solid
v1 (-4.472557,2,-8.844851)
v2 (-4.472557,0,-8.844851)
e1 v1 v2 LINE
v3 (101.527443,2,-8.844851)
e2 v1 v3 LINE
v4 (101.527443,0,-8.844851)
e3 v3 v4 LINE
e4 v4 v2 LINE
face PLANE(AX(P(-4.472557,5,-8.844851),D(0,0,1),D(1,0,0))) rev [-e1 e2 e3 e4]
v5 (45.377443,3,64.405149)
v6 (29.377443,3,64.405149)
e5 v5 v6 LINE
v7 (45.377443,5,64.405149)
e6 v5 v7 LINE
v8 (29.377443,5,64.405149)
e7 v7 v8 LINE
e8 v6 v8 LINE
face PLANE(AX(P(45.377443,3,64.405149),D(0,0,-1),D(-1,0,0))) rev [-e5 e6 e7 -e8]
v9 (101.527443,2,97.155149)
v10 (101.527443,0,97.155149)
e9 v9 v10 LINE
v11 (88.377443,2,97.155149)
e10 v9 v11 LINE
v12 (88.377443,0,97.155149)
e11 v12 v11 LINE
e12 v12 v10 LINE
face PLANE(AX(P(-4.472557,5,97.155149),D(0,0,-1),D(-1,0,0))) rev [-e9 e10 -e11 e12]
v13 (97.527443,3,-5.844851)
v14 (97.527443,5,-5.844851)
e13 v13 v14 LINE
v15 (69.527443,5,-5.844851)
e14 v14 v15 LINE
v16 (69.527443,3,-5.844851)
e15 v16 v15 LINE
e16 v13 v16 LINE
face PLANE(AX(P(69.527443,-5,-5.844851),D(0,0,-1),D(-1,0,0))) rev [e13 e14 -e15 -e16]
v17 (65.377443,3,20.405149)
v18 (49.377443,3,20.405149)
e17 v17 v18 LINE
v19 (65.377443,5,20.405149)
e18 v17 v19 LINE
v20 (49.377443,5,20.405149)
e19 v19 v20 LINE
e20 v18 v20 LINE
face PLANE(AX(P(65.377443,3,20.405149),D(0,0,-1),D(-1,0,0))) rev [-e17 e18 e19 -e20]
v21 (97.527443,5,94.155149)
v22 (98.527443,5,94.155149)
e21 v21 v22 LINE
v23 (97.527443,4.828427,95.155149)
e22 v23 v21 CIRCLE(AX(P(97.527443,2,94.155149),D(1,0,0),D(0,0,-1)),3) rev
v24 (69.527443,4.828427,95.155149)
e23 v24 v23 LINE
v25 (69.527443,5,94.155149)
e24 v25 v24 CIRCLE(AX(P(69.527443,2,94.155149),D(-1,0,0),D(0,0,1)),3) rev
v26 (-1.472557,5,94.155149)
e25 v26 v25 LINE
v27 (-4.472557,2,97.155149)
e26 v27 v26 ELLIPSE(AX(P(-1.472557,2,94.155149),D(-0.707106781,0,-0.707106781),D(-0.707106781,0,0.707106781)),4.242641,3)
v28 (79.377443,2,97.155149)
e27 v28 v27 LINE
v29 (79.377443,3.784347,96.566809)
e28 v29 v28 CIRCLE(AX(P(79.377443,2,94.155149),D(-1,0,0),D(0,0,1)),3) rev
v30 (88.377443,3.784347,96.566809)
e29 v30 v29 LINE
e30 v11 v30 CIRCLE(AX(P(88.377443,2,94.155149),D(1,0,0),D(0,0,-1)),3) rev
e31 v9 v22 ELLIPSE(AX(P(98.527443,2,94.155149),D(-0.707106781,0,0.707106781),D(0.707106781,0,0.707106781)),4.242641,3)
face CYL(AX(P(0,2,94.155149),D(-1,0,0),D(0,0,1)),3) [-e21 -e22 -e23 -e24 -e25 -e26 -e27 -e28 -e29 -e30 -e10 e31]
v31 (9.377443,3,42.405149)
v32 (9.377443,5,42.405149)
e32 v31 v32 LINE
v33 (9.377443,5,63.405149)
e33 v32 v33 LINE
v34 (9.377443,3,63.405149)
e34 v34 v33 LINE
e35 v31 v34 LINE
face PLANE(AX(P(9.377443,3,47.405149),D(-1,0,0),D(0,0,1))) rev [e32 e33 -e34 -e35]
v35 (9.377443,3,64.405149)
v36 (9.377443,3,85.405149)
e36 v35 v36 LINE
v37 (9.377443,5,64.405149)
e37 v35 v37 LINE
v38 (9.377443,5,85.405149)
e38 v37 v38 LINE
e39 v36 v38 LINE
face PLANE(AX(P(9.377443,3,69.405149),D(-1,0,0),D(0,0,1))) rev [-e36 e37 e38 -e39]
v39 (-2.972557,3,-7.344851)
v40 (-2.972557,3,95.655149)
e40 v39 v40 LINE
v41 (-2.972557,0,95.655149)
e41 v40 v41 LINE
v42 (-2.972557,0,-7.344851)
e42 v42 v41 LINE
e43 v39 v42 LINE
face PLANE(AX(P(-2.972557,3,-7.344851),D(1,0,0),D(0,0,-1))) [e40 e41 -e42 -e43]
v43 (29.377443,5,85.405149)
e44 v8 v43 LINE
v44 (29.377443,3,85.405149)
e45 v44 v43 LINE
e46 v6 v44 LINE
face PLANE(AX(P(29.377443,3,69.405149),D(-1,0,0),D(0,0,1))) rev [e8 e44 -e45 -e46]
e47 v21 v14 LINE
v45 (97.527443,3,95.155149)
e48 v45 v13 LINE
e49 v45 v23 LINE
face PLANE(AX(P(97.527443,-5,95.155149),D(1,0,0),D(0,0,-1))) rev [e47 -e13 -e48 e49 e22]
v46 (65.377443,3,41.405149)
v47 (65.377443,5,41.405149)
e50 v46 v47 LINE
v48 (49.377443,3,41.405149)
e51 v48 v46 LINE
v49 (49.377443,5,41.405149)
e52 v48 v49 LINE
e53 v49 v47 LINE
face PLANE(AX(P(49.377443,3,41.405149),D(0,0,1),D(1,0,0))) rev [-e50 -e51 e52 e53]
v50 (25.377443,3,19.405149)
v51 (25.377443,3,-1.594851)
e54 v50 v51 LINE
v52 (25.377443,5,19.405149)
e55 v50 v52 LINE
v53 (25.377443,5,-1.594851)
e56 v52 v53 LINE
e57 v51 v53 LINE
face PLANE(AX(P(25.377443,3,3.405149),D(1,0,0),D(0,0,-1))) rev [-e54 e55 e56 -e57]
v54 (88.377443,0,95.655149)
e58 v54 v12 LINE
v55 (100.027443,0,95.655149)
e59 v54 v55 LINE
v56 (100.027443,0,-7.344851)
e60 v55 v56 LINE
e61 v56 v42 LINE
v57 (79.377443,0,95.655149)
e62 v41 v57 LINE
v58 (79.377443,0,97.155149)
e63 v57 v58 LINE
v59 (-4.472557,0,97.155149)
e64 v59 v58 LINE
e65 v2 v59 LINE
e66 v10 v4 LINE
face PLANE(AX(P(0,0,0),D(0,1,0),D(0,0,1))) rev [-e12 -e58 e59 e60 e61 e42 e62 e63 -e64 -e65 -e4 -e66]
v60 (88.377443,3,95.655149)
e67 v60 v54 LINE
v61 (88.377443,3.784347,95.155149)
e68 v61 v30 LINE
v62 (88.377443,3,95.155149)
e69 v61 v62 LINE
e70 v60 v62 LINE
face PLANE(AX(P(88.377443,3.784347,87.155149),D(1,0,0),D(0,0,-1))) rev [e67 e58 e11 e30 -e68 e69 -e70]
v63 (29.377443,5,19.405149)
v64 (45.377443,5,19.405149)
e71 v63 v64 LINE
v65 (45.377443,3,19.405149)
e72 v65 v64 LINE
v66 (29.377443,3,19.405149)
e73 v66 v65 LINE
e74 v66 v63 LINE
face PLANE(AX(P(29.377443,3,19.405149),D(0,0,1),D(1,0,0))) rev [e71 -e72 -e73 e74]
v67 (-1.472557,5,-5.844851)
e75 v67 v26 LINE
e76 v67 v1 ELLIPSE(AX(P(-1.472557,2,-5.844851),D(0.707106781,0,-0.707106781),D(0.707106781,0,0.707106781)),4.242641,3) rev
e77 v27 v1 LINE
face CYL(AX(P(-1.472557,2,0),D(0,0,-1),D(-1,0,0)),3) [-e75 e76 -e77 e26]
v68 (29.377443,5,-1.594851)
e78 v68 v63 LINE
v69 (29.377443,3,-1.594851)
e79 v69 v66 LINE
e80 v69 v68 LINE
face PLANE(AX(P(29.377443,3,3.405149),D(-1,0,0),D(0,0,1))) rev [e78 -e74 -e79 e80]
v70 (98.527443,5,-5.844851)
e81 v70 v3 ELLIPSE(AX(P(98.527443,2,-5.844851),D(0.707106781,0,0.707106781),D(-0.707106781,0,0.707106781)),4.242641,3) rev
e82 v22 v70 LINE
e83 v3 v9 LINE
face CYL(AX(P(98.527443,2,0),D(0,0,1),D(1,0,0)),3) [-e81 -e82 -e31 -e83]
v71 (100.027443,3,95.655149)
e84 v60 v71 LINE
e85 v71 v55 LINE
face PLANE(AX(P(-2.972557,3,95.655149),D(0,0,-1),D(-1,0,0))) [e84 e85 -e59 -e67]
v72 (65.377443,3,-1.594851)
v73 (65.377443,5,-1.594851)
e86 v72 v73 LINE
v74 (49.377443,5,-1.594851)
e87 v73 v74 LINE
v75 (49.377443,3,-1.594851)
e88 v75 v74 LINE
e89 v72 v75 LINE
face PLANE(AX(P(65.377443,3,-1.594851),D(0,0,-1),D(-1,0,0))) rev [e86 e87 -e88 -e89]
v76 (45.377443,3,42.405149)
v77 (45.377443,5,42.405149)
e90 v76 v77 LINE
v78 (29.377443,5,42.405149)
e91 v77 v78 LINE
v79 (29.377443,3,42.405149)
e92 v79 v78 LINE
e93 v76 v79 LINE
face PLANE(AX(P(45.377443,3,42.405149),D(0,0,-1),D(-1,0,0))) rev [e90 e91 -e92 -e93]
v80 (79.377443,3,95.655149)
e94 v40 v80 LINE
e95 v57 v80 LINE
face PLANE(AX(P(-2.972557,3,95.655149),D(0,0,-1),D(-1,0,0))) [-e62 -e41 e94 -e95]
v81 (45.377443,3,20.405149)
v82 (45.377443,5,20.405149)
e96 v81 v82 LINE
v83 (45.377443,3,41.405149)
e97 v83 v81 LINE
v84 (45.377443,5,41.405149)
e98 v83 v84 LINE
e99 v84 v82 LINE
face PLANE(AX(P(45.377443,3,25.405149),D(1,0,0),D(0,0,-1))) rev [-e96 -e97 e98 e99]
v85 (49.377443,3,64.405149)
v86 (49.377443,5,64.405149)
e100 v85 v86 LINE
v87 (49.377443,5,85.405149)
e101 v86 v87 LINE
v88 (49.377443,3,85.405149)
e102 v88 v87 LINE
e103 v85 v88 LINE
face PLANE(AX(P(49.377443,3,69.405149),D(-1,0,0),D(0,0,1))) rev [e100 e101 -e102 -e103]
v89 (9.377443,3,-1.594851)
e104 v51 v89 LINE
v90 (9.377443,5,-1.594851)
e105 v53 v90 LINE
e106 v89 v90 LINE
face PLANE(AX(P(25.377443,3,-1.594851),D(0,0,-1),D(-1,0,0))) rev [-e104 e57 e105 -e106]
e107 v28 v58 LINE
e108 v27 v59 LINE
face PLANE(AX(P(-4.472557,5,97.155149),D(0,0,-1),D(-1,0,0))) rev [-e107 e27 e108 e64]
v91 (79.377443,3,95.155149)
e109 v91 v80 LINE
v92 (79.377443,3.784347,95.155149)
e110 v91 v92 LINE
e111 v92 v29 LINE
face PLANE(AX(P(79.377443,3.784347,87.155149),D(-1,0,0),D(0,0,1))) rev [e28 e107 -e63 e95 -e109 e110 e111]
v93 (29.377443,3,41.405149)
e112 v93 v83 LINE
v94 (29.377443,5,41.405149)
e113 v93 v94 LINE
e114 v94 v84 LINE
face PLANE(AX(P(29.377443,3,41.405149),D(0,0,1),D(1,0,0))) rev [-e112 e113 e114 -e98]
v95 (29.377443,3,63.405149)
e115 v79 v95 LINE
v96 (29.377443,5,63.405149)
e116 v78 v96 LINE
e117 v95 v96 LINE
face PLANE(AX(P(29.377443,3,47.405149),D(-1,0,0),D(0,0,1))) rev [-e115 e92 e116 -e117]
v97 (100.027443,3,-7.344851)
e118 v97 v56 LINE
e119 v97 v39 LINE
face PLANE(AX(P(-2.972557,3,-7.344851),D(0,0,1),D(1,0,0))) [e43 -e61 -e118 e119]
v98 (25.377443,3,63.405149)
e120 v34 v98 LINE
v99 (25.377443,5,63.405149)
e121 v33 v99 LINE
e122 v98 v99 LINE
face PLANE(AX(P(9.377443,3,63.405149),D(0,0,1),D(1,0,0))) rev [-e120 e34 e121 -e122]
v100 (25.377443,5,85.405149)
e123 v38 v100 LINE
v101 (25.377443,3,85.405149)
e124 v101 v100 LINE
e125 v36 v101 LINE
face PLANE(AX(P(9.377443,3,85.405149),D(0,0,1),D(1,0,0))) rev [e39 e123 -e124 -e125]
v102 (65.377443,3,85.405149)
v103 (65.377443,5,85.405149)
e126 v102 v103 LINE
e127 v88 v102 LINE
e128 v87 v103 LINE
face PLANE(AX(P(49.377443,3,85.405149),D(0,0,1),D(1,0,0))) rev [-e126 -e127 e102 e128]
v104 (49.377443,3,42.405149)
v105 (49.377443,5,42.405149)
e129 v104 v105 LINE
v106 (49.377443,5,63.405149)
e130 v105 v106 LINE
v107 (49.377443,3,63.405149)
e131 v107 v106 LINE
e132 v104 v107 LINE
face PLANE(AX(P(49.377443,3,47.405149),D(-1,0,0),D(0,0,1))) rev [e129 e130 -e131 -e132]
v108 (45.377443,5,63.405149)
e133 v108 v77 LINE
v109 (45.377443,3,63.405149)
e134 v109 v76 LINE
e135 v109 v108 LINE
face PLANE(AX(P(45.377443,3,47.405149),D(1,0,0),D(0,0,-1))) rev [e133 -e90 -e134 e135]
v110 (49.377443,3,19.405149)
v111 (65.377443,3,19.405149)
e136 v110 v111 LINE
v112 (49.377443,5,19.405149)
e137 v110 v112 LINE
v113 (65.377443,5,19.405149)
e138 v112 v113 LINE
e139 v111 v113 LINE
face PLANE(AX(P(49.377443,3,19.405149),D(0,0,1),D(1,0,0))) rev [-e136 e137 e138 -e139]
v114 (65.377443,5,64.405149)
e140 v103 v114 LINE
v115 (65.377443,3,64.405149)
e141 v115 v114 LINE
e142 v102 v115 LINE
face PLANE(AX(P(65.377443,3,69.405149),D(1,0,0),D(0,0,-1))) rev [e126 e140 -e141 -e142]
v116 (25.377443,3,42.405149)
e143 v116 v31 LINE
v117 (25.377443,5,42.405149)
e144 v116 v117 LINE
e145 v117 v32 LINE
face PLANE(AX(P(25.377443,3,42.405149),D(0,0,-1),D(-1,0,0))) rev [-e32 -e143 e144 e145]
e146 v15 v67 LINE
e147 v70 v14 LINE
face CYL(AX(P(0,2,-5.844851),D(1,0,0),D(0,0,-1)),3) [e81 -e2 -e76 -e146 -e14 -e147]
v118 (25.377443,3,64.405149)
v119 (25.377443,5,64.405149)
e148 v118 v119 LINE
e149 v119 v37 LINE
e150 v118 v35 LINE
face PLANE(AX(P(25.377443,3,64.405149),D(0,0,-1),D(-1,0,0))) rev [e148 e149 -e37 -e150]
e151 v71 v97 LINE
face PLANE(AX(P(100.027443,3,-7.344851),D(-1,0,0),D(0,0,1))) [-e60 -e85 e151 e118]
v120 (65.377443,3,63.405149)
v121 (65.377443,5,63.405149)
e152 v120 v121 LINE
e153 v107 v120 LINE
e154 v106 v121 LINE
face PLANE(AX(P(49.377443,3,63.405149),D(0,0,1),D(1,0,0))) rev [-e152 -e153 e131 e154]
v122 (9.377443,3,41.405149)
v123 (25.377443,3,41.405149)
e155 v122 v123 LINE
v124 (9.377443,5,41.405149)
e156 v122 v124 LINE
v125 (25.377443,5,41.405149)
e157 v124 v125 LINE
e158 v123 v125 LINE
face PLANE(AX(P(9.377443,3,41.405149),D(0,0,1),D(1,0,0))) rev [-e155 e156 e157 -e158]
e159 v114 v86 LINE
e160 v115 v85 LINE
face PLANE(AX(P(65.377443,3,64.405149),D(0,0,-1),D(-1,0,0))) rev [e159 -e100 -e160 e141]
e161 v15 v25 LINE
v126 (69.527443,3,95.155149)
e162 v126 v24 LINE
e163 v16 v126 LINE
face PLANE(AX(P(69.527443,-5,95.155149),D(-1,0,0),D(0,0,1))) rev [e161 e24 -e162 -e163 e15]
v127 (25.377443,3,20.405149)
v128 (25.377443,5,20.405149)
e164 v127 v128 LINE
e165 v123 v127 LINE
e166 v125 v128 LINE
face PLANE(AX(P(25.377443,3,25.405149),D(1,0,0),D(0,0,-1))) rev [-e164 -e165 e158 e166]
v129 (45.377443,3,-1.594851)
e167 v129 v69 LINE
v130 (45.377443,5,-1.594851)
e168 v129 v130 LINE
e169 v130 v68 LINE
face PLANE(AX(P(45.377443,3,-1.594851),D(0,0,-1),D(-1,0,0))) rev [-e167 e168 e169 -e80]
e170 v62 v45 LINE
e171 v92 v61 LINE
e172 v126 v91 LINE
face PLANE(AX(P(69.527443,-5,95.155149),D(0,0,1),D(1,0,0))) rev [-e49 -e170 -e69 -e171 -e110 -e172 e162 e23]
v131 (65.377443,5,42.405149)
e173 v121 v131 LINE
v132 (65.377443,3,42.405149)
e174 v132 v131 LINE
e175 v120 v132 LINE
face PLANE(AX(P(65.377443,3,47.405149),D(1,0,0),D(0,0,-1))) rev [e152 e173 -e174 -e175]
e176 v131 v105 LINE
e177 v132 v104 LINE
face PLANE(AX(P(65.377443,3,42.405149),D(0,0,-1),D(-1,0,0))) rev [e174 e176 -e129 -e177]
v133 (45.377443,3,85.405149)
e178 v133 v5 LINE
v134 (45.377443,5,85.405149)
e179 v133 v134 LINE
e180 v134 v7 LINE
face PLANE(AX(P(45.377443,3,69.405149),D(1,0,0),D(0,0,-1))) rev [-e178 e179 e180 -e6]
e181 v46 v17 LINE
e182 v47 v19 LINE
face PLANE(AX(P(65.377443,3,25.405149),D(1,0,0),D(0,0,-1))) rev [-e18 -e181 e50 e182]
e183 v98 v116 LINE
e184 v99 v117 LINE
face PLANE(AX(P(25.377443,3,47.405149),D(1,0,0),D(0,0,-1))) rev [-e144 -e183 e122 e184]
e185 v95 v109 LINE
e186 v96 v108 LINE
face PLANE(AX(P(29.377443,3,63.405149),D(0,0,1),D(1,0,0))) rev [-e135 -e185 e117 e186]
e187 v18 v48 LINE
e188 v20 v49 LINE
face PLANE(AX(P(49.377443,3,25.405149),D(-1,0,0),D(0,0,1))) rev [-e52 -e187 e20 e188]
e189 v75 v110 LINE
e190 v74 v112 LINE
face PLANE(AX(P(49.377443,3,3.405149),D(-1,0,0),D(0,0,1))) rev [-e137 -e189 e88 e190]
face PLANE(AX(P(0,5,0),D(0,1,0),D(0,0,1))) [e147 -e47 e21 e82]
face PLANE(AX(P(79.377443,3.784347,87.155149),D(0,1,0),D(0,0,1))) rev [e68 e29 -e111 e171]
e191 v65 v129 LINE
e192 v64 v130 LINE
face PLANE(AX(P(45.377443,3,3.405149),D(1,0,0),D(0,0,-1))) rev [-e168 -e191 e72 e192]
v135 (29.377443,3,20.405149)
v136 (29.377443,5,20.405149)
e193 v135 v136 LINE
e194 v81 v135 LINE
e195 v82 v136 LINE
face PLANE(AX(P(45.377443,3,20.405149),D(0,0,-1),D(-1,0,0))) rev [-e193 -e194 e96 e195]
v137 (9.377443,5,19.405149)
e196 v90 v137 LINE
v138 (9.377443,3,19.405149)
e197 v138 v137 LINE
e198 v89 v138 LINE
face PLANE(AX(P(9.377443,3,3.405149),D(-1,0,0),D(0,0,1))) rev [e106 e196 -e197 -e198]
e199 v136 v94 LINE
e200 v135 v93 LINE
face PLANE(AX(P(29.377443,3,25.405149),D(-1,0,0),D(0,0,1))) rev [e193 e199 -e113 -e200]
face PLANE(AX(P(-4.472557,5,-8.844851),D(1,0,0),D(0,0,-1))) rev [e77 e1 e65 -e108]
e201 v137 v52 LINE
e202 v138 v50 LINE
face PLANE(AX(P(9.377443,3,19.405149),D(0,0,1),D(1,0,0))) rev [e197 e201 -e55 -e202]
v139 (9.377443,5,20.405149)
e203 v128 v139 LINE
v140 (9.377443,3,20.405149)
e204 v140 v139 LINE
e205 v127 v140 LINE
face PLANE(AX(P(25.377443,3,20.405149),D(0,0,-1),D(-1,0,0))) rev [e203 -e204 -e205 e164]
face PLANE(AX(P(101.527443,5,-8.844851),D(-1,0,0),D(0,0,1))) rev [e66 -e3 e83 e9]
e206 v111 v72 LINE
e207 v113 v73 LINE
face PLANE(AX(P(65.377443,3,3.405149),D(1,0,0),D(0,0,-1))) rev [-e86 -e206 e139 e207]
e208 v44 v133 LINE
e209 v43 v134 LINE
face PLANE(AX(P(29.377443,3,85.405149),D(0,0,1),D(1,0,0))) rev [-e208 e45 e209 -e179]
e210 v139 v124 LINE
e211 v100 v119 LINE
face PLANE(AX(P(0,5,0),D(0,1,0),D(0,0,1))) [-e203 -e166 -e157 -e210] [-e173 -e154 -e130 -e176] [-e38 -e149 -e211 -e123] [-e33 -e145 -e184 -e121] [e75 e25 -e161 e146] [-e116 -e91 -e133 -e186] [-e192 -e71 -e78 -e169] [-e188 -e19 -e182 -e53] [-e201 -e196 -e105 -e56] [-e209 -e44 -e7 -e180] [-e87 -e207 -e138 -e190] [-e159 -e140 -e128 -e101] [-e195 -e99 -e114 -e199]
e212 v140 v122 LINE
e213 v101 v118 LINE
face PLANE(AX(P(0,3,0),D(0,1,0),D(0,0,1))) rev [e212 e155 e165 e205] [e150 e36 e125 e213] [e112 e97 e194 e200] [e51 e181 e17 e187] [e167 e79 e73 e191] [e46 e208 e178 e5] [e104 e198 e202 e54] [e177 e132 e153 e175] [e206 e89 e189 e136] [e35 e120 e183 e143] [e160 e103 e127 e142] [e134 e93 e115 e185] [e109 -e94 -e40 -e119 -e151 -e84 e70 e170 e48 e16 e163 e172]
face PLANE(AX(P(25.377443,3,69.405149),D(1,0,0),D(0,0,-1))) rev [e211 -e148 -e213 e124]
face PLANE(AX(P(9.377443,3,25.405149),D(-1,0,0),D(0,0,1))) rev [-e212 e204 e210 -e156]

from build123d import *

# Parameters (mm, degrees)
SKETCH2_W            = 106
SKETCH2_H            = 106
BOSS_EXTRUDE3_DEPTH  = 5
SKETCH3_W            = 103
SKETCH3_H            = 103
CUT_EXTRUDE1_DEPTH   = 3
SKETCH4_W            = 9
SKETCH4_H            = 3.784346923
CUT_EXTRUDE2_DEPTH   = 10
FILLET1_R            = 3
SKETCH5_W            = 28
SKETCH5_H            = 101
CUT_EXTRUDE3_DEPTH   = 10
CUT_EXTRUDE5_DEPTH   = 2
LPATTERN1_COUNT      = 4
LPATTERN1_PITCH      = 22
LPATTERN1_COUNT_DIR2 = 3
LPATTERN1_PITCH_DIR2 = 20


with BuildPart() as part:
    # Sketch2 → Boss-Extrude3 (new body)
    with BuildSketch(Plane(origin=(0, 0, 0), x_dir=(1, 0, 0), z_dir=(0, 1, 0))):
        with Locations((48.527443435, -44.155148704)):
            Rectangle(SKETCH2_W, SKETCH2_H)
    extrude(amount=BOSS_EXTRUDE3_DEPTH)

    # Sketch3 → Cut-Extrude1 (cut)
    with BuildSketch(Plane(origin=(0, 0, 0), x_dir=(1, 0, 0), z_dir=(0, 1, 0))):
        with Locations((48.527443435, -44.155148704)):
            Rectangle(SKETCH3_W, SKETCH3_H)
    extrude(amount=CUT_EXTRUDE1_DEPTH, mode=Mode.SUBTRACT)

    # Sketch4 → Cut-Extrude2 (cut)
    with BuildSketch(Plane.XY.offset(97.155148704)):
        with Locations((83.877443435, 1.892173462)):
            Rectangle(SKETCH4_W, SKETCH4_H)
    extrude(amount=-CUT_EXTRUDE2_DEPTH, mode=Mode.SUBTRACT)

    # Fillet1
    # the kernel refuses this fillet: 3 mm, written as the material it takes off along each edge
    with BuildSketch(Plane(origin=(101.527443435, 5, -16.344851296), x_dir=(0, -1, 0), z_dir=(0, 0, 1)), Plane(origin=(-11.972556565, 5, -8.844851296), x_dir=(0, -1, 0), z_dir=(1, 0, 0)), Plane(origin=(-4.472556565, 5, 104.655148704), x_dir=(0, -1, 0), z_dir=(0, 0, -1))) as fillet1_piece_1:
        with BuildLine():
            CenterArc((FILLET1_R, -FILLET1_R), FILLET1_R, 90, 90)
            Line((0, -FILLET1_R), (0, 0))
            Line((0, 0), (FILLET1_R, 0))
        make_face()
    extrude(amount=121, mode=Mode.SUBTRACT)
    with BuildSketch(Plane(origin=(109.027443435, 5, 97.155148704), x_dir=(0, 0, -1), z_dir=(-1, 0, 0))) as fillet1_piece_2:
        with BuildLine():
            CenterArc((FILLET1_R, FILLET1_R), FILLET1_R, 180, 90)
            Line((0, FILLET1_R), (0, 0))
            Line((0, 0), (FILLET1_R, 0))
        make_face()
    extrude(amount=121, mode=Mode.SUBTRACT)

    # Sketch5 → Cut-Extrude3 (cut)
    with BuildSketch(Plane(origin=(0, 5, 0), x_dir=(1, 0, 0), z_dir=(0, 1, 0))):
        with Locations((83.527443435, -44.655148704)):
            Rectangle(SKETCH5_W, SKETCH5_H)
    extrude(amount=-CUT_EXTRUDE3_DEPTH, mode=Mode.SUBTRACT)

    # Sketch6 → Cut-Extrude5 (cut)
    with BuildSketch(Plane(origin=(0, 5, 0), x_dir=(1, 0, 0), z_dir=(0, 1, 0))):
        Polygon((49.377443435, -69.405148704), (49.377443435, -85.405148704), (65.377443435, -85.405148704), (65.377443435, -69.405148704), (65.377443435, -64.405148704), (49.377443435, -64.405148704), align=None)
    cut_extrude5 = extrude(amount=-CUT_EXTRUDE5_DEPTH, mode=Mode.SUBTRACT)

    # LPattern1: Cut-Extrude5 4 × 3
    with Locations(*[(-j * LPATTERN1_PITCH_DIR2, 0, -i * LPATTERN1_PITCH) for i in range(LPATTERN1_COUNT) for j in range(LPATTERN1_COUNT_DIR2) if (i, j) != (0, 0)]):
        add(cut_extrude5, mode=Mode.SUBTRACT)


solid = part.part
